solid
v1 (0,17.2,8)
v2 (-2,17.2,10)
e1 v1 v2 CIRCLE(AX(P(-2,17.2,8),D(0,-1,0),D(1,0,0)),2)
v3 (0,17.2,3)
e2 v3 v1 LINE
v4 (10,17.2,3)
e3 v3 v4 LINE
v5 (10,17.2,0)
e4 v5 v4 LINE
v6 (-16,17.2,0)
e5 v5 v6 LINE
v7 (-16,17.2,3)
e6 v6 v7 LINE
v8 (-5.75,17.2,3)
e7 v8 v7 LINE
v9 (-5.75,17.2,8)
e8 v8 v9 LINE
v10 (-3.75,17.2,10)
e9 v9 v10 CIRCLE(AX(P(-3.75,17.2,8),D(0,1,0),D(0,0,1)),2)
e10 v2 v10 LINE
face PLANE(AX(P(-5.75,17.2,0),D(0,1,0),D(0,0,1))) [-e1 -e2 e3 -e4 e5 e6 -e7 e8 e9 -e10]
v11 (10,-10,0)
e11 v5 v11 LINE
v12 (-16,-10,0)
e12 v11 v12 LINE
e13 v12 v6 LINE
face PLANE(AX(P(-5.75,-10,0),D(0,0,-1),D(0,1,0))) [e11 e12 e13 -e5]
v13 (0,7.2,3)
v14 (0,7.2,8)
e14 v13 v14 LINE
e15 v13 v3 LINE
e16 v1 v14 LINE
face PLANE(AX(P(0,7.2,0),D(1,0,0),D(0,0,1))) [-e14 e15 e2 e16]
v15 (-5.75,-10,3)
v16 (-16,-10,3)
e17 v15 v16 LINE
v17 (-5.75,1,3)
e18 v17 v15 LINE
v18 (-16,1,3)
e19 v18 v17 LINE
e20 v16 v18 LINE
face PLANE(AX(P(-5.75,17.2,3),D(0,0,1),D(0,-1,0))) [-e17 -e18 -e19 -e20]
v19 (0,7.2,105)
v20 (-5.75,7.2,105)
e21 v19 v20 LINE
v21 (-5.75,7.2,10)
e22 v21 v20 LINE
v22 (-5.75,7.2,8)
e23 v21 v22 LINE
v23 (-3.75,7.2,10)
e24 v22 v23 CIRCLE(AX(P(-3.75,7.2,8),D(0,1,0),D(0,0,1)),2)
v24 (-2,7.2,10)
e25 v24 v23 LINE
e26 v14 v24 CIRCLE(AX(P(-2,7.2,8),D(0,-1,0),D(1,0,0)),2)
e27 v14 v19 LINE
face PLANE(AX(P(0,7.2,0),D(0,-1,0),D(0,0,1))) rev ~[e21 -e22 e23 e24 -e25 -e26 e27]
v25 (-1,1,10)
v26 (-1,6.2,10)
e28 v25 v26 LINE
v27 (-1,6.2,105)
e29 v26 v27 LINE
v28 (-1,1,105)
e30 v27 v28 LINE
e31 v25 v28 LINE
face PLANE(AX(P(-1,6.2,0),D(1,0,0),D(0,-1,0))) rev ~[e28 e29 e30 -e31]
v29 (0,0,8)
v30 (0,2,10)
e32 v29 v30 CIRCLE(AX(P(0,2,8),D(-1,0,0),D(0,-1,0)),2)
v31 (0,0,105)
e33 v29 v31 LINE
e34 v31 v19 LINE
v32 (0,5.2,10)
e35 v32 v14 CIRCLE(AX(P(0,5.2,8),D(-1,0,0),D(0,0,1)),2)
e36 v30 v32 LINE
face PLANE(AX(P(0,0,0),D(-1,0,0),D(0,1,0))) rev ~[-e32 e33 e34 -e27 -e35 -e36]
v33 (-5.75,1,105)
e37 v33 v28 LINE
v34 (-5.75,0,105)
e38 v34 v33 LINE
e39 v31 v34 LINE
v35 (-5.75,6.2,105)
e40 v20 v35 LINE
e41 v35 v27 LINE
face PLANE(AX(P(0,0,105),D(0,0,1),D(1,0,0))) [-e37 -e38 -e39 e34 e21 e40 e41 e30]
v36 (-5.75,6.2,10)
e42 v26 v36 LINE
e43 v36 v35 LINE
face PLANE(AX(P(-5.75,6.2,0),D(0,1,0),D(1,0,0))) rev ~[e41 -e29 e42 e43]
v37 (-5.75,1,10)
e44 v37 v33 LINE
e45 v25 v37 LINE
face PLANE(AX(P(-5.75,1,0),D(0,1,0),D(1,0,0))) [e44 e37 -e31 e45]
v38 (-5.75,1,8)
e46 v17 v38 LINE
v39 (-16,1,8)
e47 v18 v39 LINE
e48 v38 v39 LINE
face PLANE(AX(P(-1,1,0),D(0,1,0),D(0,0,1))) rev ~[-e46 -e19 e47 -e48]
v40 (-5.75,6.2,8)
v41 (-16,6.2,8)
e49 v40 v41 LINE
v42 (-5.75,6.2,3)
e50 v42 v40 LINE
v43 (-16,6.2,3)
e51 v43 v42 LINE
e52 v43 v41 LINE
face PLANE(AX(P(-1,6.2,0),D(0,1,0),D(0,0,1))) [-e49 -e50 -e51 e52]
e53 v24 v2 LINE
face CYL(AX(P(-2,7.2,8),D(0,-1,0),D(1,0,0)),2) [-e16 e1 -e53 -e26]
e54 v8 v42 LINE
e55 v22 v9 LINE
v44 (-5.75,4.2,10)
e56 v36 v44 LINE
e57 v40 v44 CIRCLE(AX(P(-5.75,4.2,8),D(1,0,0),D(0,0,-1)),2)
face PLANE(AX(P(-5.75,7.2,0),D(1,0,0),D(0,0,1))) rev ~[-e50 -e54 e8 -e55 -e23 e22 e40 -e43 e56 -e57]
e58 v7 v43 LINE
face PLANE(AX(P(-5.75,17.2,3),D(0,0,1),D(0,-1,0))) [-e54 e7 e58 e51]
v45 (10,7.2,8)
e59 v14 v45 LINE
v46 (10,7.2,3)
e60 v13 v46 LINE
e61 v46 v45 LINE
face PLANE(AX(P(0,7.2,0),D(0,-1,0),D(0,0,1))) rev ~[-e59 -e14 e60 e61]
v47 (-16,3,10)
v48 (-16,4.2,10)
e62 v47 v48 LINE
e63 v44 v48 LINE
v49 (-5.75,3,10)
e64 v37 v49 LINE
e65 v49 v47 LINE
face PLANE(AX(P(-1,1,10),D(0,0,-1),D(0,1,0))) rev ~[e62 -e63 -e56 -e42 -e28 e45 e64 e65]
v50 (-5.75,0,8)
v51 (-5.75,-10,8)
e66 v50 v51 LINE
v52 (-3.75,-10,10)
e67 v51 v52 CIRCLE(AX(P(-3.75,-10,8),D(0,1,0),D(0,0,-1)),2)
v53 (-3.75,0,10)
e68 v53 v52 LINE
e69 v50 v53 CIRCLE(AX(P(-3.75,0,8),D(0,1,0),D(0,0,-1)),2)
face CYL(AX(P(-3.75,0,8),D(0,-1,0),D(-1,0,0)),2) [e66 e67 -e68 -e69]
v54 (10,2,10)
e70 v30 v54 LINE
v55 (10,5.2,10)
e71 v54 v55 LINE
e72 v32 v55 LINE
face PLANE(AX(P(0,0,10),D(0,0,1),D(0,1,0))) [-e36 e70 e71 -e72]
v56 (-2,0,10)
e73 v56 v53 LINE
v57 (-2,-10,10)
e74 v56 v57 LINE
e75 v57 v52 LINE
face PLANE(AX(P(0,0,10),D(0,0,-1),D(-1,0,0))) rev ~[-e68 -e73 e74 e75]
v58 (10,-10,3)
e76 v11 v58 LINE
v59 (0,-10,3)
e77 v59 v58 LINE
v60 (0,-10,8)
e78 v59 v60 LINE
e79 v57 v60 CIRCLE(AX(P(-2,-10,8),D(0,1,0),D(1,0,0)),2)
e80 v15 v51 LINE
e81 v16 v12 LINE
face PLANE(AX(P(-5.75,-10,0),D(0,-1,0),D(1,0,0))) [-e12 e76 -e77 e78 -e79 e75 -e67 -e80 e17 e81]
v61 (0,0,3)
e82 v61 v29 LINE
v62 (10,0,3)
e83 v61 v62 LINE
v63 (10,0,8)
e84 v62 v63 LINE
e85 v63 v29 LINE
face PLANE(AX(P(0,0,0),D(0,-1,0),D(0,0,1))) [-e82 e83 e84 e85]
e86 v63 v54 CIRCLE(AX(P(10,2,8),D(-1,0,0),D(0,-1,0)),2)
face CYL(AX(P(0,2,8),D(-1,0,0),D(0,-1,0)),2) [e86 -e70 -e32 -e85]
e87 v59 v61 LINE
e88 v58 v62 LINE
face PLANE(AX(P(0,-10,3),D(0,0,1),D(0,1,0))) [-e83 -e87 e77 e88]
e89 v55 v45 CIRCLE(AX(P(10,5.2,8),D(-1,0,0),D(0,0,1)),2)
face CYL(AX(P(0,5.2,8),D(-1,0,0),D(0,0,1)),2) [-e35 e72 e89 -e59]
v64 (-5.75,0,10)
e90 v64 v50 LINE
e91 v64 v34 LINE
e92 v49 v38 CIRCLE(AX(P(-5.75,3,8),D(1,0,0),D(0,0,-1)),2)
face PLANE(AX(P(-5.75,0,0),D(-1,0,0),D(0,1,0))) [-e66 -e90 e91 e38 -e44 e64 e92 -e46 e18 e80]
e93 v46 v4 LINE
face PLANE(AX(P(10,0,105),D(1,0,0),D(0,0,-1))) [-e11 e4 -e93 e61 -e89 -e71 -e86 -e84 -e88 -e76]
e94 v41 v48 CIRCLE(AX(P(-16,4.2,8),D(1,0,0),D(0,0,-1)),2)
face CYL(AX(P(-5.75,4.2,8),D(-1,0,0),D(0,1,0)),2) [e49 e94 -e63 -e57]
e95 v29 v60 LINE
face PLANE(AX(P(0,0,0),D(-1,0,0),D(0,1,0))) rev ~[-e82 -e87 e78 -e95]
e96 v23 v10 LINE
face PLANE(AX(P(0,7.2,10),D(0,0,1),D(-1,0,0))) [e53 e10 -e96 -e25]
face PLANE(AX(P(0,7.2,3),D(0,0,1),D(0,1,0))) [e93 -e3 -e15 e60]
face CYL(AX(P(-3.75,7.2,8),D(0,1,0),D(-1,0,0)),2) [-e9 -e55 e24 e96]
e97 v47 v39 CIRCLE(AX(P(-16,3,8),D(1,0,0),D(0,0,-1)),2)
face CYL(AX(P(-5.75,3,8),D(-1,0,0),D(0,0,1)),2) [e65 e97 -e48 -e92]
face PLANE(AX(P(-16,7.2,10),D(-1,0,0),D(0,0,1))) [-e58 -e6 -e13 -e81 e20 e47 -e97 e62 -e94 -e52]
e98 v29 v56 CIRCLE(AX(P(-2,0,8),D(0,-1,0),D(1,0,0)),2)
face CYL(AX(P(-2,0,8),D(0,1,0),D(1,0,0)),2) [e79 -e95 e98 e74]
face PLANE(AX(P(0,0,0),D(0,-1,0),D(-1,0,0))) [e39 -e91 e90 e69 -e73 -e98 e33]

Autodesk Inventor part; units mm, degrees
ref_plane "YZ Plane" through (0, 0, 0) normal (1, 0, 0) x (0, 1, 0)
ref_plane "XZ Plane" through (0, 0, 0) normal (0, 1, 0) x (-1, 0, 0)
ref_plane "XY Plane" through (0, 0, 0) normal (0, 0, 1) x (1, 0, 0)
sketch "Esboço1" plane through (0, 0, 0) normal (0, 0, 1) x (1, 0, 0)
  point P0 (0, 0)
sketch "Esboço2" plane through (0, 0, 0) normal (0, 0, 1) x (1, 0, 0)
  line L0 (0, 0) -> (0, 7.2)
  line L1 (0, 7.2) -> (-5.75, 7.2)
  line L2 (-5.75, 7.2) -> (-5.75, 6.2)
  line L3 (-5.75, 6.2) -> (-1, 6.2)
  line L4 (-1, 6.2) -> (-1, 1)
  line L5 (0, 0) -> (-5.75, 0)
  line L6 (-5.75, 0) -> (-5.75, 1)
  line L7 (-5.75, 1) -> (-1, 1)
  dimension "d0" = 7.2
  dimension "d1" = 1
  dimension "d2" = 5.75
  dimension "d3" = 4.75
  dimension "d4" = 5.2
extrude "Extrusão1" add sketch "Esboço2" along normal blind 105
sketch "Esboço3" plane through (-5.75, 0, 0) normal (0, -1, 0) x (1, 0, 0)
  line L0 (5.75, 0) -> (5.75, 105) projected
  line L1 (5.75, 0) -> (5.75, 10)
  line L2 (5.75, 10) -> (0, 10)
  line L3 (0, 0) -> (0, 105) projected
  line L4 (0, 10) -> (0, 0)
  line L5 (0, 0) -> (5.75, 0) projected
  line L6 (0, 0) -> (5.75, 0)
  dimension "d7" = 10
extrude "Extrusão2" add sketch "Esboço3" along normal blind 10
sketch "Esboço4" plane through (0, 0, 105) normal (1, 0, 0) x (0, 0, -1)
  line L0 (105, -10) -> (105, 7.2) projected
  line L1 (105, 0) -> (105, 7.2)
  line L2 (95, 0) -> (95, -10) projected
  line L3 (105, 0) -> (95, 0)
  line L4 (95, 0) -> (95, 7.2)
  line L5 (105, 7.2) -> (0, 7.2) projected
  line L6 (95, 7.2) -> (105, 7.2)
extrude "Extrusão3" add sketch "Esboço4" along normal blind 10
sketch "Esboço5" plane through (-5.75, 7.2, 105) normal (0, 1, 0) x (1, 0, 0)
  line L0 (0, 105) -> (5.75, 105)
  line L1 (0, 105) -> (15.75, 105) projected
  line L2 (5.75, 105) -> (5.75, 95) projected
  line L3 (5.75, 95) -> (5.75, 105)
  line L4 (5.75, 95) -> (5.75, 0) projected
  line L5 (5.75, 105) -> (5.75, 95)
  line L6 (5.75, 95) -> (0, 95)
  line L7 (0, 105) -> (0, 0) projected
  line L8 (0, 95) -> (0, 105)
extrude "Extrusão4" add sketch "Esboço5" along normal blind 10
sketch "Esboço6" plane through (0, 7.2, 10) normal (1, 0, 0) x (0, 0, -1)
  line L0 (10, -6.2) -> (10, -17.2) projected
  line L1 (10, -7.2) -> (0, -7.2) projected
  line L2 (10, -17.2) -> (7, -17.2)
  line L3 (7, -17.2) -> (7, -7.2)
  line L4 (7, -7.2) -> (10, -7.2)
  line L5 (10, -7.2) -> (10, -17.2)
  line L6 (10, -1) -> (10, 10) projected
  line L7 (10, 10) -> (0, 10) projected
  line L8 (10, 0) -> (7, 0)
  line L9 (7, 0) -> (7, 10)
  line L10 (7, 10) -> (10, 10)
  line L11 (10, 10) -> (10, 0)
  dimension "d14" = 3
extrude "Extrusão5" add sketch "Esboço6" along normal blind 10
fillet "Arredondamento1" radius 2 4 edges at (5, 7.2, 10) (0, 12.2, 10) (5, 0, 10) (0, -5, 10)
sketch "Esboço7" plane through (-1, 1, 0) normal (-1, 0, 0) x (0, 0, 1)
  line L0 (10, -1) -> (10, -11) projected
  line L1 (10, 16.2) -> (10, 6.2) projected
  line L2 (10, -1) -> (10, 6.2)
  line L3 (0, 0) -> (0, -11) projected
  line L4 (0, 5.2) -> (105, 5.2) projected
  line L5 (0, 0) -> (10, 0)
  line L6 (10, 0) -> (10, 5.2)
  line L7 (10, 5.2) -> (0, 5.2)
  line L8 (0, 5.2) -> (0, 0)
  point P0 (0, -1)
extrude "Extrusão6" add sketch "Esboço7" along normal blind 15
sketch "Esboço8" plane through (-5.75, 7.2, 10) normal (-1, 0, 0) x (0, 0, 1)
  line L0 (-10, 10) -> (0, 10) projected
  line L1 (-7, -7.2) -> (-7, -17.2) projected
  line L2 (-10, 10) -> (-7, 10)
  line L3 (-7, 10) -> (-7, -17.2)
  line L4 (-7, -17.2) -> (-10, -17.2)
  line L5 (-10, -17.2) -> (-10, 10)
  point P0 (-10, -7.2)
extrude "Extrusão7" add sketch "Esboço8" along normal blind 10.25
fillet "Arredondamento2" radius 2 4 edges at (-5.75, 12.2, 10) (-10.875, 6.2, 10) (-10.875, 1, 10) (-5.75, -5, 10)
properties part number "suporte para arma"
